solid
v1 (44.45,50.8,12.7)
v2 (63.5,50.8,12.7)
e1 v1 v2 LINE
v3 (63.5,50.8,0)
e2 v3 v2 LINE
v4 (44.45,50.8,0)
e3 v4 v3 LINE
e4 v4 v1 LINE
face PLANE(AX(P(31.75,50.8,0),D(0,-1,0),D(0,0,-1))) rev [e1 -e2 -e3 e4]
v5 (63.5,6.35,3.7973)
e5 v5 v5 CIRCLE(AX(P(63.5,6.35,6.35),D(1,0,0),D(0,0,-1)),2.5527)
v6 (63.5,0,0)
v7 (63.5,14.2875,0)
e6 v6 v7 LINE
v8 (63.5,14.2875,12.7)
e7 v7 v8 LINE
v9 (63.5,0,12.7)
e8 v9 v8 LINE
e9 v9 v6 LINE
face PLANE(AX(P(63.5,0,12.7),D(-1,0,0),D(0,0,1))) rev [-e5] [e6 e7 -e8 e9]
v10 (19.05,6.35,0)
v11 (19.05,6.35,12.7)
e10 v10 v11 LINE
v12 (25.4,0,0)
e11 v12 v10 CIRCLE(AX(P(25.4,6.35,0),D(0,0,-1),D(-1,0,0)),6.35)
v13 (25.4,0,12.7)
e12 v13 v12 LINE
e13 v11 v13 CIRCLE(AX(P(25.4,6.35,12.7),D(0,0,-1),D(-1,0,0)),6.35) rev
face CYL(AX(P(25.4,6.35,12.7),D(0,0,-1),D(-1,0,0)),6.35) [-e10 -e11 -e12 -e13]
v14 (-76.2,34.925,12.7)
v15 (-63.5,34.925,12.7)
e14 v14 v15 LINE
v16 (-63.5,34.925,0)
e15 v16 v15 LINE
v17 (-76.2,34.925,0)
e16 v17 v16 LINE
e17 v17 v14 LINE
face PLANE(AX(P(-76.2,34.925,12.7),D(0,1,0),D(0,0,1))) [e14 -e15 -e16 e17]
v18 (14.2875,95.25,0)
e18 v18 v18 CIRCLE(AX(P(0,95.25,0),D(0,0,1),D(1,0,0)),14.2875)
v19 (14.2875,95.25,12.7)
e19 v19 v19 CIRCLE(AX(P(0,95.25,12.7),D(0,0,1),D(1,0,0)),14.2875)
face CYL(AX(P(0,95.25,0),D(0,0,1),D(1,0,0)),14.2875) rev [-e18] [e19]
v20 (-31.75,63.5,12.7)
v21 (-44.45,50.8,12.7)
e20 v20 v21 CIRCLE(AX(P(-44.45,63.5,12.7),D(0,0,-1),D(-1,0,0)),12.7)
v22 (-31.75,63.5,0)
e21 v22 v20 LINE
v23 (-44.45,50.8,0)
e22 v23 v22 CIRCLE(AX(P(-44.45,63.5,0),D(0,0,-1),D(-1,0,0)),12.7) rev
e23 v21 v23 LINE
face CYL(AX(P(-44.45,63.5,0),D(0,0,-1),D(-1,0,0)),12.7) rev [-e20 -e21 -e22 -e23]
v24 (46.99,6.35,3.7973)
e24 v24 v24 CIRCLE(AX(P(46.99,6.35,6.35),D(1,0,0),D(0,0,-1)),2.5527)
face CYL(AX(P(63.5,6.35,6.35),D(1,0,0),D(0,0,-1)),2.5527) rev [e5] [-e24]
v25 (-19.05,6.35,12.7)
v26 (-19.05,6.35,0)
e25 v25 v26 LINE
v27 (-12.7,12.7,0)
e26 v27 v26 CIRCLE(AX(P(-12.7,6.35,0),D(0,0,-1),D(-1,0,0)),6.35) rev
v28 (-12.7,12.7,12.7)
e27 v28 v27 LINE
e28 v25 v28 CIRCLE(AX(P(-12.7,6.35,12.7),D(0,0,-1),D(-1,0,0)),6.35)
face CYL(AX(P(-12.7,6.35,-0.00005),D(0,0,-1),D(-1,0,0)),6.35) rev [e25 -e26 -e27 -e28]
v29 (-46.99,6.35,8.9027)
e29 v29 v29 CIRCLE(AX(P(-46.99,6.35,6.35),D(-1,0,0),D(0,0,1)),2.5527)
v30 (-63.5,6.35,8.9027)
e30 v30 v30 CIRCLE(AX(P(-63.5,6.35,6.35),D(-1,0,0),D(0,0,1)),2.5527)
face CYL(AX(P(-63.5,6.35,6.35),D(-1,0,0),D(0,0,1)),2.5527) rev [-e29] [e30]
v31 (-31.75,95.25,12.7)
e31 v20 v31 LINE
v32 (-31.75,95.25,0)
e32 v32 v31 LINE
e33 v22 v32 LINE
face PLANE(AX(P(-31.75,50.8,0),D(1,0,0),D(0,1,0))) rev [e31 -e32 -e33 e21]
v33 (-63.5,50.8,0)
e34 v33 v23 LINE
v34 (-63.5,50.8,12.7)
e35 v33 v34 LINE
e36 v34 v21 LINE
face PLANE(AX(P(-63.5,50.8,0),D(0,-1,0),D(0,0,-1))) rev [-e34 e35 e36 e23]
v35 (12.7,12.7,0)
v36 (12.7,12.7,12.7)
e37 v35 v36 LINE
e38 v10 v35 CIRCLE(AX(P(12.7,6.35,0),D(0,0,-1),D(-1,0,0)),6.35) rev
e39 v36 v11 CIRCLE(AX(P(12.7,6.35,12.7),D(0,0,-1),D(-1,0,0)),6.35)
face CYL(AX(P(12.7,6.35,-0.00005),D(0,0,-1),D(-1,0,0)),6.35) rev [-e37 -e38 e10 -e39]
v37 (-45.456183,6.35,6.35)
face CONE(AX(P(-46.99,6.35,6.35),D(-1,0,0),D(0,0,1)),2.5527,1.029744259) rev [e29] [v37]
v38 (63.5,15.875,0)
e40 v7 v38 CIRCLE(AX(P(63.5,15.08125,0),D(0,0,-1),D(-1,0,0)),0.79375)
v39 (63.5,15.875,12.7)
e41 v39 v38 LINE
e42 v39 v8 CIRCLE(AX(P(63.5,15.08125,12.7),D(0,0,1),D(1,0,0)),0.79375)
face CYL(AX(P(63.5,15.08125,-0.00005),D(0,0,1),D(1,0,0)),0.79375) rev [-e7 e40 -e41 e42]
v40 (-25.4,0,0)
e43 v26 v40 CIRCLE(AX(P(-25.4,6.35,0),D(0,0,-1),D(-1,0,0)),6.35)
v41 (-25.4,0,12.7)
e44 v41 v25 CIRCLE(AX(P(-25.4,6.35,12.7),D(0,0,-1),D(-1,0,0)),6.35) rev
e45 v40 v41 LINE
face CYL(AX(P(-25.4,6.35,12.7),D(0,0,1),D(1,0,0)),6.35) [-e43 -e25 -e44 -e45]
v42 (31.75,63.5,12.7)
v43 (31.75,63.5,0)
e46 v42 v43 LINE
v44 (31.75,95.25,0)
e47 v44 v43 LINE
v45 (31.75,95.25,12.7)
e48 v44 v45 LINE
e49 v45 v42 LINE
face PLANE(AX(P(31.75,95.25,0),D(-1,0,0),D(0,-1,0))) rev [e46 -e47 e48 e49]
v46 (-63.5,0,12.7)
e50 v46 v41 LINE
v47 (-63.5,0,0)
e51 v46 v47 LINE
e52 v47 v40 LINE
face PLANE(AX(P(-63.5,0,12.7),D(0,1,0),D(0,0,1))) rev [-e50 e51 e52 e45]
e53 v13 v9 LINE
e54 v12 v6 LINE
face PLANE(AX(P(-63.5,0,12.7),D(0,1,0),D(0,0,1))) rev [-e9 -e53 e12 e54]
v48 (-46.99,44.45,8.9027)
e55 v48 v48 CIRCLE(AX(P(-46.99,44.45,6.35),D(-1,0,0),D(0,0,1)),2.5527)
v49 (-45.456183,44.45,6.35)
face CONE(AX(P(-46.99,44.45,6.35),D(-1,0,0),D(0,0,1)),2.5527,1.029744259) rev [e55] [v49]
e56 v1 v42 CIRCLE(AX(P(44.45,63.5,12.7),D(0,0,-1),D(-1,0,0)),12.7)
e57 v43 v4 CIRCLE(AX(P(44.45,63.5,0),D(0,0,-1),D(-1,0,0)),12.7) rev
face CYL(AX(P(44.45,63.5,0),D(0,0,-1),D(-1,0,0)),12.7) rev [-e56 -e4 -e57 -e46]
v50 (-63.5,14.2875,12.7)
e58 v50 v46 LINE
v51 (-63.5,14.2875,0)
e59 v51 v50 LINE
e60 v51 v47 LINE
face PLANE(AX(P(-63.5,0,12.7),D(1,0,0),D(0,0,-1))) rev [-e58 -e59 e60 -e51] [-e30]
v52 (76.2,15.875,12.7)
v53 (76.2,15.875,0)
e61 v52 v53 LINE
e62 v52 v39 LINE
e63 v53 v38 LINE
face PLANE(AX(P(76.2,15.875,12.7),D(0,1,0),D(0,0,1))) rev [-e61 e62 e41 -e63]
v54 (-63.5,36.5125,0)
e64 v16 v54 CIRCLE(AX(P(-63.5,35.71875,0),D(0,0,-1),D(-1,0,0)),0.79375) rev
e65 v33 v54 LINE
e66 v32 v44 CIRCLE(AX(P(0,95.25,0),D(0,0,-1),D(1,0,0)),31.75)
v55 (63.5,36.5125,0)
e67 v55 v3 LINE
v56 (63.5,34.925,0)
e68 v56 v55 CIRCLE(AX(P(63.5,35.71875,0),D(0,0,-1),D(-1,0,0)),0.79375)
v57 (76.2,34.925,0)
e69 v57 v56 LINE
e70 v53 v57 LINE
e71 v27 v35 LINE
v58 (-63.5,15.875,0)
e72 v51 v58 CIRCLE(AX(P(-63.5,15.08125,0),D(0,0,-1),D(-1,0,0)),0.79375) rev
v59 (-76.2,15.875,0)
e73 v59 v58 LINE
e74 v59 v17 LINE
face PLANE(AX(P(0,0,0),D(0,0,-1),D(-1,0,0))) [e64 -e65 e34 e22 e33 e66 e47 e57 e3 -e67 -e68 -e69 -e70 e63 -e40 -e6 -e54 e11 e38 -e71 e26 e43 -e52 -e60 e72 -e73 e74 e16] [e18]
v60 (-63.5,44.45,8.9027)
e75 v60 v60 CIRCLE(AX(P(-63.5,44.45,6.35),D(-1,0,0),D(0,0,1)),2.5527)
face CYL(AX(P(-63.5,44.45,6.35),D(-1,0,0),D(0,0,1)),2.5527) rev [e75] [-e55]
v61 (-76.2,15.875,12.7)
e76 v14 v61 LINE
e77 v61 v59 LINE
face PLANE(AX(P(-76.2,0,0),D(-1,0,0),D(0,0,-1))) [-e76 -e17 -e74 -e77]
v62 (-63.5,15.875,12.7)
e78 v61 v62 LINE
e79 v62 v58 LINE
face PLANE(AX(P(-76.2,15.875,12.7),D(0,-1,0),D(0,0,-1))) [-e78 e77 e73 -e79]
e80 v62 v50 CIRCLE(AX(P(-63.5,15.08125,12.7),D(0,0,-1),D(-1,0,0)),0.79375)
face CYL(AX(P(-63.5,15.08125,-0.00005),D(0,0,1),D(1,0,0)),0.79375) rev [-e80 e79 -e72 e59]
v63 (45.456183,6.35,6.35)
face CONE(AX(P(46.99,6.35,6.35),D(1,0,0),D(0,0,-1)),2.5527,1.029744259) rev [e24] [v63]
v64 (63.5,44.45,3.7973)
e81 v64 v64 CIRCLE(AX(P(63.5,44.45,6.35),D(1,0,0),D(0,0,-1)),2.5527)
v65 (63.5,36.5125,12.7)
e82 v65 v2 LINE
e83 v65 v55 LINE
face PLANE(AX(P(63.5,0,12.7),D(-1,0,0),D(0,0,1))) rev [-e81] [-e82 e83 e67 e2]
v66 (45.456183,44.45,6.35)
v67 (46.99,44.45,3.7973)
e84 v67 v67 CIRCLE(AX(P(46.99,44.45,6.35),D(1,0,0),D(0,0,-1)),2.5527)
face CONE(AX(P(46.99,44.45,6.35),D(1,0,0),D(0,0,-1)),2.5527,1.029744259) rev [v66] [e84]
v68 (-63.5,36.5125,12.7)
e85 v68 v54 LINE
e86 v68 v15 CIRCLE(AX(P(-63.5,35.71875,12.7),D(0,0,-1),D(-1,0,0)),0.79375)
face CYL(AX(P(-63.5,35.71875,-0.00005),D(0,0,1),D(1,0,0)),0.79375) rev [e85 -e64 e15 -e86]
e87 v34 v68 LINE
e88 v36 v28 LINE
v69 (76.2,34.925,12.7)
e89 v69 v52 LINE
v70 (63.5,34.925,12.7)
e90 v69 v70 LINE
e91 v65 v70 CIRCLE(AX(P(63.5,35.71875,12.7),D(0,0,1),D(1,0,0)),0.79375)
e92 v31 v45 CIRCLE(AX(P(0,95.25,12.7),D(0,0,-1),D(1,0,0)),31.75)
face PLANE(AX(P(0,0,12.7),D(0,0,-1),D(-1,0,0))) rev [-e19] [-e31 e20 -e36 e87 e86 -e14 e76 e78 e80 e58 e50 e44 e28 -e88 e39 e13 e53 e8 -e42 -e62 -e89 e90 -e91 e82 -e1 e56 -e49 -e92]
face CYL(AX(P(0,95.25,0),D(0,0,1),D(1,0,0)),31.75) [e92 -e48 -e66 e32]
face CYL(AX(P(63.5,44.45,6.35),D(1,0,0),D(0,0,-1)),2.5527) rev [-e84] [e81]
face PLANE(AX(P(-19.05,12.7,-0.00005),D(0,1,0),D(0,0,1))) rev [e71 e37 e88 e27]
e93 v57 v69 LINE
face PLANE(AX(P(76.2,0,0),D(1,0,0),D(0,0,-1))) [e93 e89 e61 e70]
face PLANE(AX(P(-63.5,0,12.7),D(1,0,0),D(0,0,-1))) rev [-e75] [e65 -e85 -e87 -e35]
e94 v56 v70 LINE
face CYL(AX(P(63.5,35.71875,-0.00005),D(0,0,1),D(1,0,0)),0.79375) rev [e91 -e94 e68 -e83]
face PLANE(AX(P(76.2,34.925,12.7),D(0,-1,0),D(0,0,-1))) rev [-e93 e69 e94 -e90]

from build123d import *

# Parameters (mm, degrees)
SKETCH1_W                        = 127
SKETCH1_H                        = 152.4
BOSS_EXTRUDE1_DEPTH              = 12.7
SKETCH2_R                        = 14.2875
CUT_EXTRUDE1_DEPTH               = 166.587741092
FILLET1_R                        = 12.7
F_1_4_20_TAPPED_HOLE1_AT_2_COUNT = 2
F_1_4_20_TAPPED_HOLE1_AT_2_PITCH = 38.1
SKETCH5_W                        = 12.7
SKETCH5_H                        = 19.05
BOSS_EXTRUDE2_DEPTH              = 12.7
SKETCH6_R                        = 0.79375
CUT_EXTRUDE2_DEPTH               = 149.649688866
SKETCH7_W                        = 38.1
SKETCH7_H                        = 12.7
CUT_EXTRUDE3_DEPTH               = 149.649688866
FILLET2_START                    = -1
FILLET2_DEPTH                    = 15
FILLET2_2_DEPTH                  = 12.7


with BuildPart() as part:
    # Sketch1 → Boss-Extrude1 (new body)
    with BuildSketch(Plane.XY):
        with Locations((0, 76.2)):
            Rectangle(SKETCH1_W, SKETCH1_H)
    extrude(amount=BOSS_EXTRUDE1_DEPTH)

    # Sketch2 → Cut-Extrude1 (cut, through all)
    with BuildSketch(Plane.XY.offset(12.7)):
        with Locations((0, 95.25)):
            Circle(SKETCH2_R)
        with BuildLine():
            Line((31.75, 95.25), (31.75, 50.8))
            Line((31.75, 50.8), (63.5, 50.8))
            Line((63.5, 50.8), (63.5, 152.4))
            Line((63.5, 152.4), (-63.5, 152.4))
            Line((-63.5, 152.4), (-63.5, 50.8))
            Line((-63.5, 50.8), (-31.75, 50.8))
            Line((-31.75, 50.8), (-31.75, 95.25))
            ThreePointArc((-31.75, 95.25), (0, 127), (31.75, 95.25))
        make_face()
    extrude(amount=-CUT_EXTRUDE1_DEPTH, mode=Mode.SUBTRACT)

    # Fillet1
    fillet1_edges = [part.edges().sort_by_distance(p)[0] for p in [
        (-31.75, 50.8, 6.35),
        (31.75, 50.8, 6.35),
    ]]
    fillet(fillet1_edges, radius=FILLET1_R)

    # Sketch3 → 1/4-20 Tapped Hole1 (revolve, cut)
    with BuildSketch(Plane(origin=(63.5, 44.45, 6.35), x_dir=(0, 0, -1), z_dir=(0, 1, 0))):
        Polygon((0, 0), (0, 18.043816902), (2.5527, 16.51), (2.5527, 0), align=None)
    f_1_4_20_tapped_hole1 = revolve(axis=Axis((69.85, 44.45, 6.35), (-1, 0, 0)), mode=Mode.SUBTRACT)

    # 1/4-20 Tapped Hole1 at 2: 1/4-20 Tapped Hole1 ×2
    with Locations(*[(0, -i * F_1_4_20_TAPPED_HOLE1_AT_2_PITCH, 0) for i in range(1, F_1_4_20_TAPPED_HOLE1_AT_2_COUNT)]):
        add(f_1_4_20_tapped_hole1, mode=Mode.SUBTRACT)

    # Sketch5 → Boss-Extrude2 (add)
    with BuildSketch(Plane(origin=(63.5, 0, 0), x_dir=(0, 0, -1), z_dir=(1, 0, 0))):
        with Locations((-6.35, 25.4)):
            Rectangle(SKETCH5_W, SKETCH5_H)
    boss_extrude2 = extrude(amount=BOSS_EXTRUDE2_DEPTH)

    # Sketch6 → Cut-Extrude2 (cut, through all)
    with BuildSketch(Plane.XY.offset(12.7)):
        with Locations((63.5, 35.71875)):
            Circle(SKETCH6_R)
        with Locations((63.5, 15.08125)):
            Circle(SKETCH6_R)
    cut_extrude2 = extrude(amount=-CUT_EXTRUDE2_DEPTH, mode=Mode.SUBTRACT)

    # Mirror1: 1/4-20 Tapped Hole1, Boss-Extrude2, Cut-Extrude2 across plane
    add(f_1_4_20_tapped_hole1.mirror(Plane(origin=(0, 0, 0), x_dir=(0, 0, 1), z_dir=(1, 0, 0))), mode=Mode.SUBTRACT)
    add(boss_extrude2.mirror(Plane(origin=(0, 0, 0), x_dir=(0, 0, 1), z_dir=(1, 0, 0))))
    add(cut_extrude2.mirror(Plane(origin=(0, 0, 0), x_dir=(0, 0, 1), z_dir=(1, 0, 0))), mode=Mode.SUBTRACT)

    # Mirror1 copy 1 sketch → Mirror1 copy 1 (revolve, cut)
    with BuildSketch(Plane(origin=(-63.5, 6.35, 6.35), x_dir=(0, 0, -1), z_dir=(0, 1, 0))):
        Polygon((0, 0), (0, -18.043816902), (2.5527, -16.51), (2.5527, 0), align=None)
    revolve(axis=Axis((-69.85, 6.35, 6.35), (-1, 0, 0)), mode=Mode.SUBTRACT)

    # Sketch7 → Cut-Extrude3 (cut, through all)
    with BuildSketch(Plane.XY.offset(12.7)):
        with Locations((0, 6.35)):
            Rectangle(SKETCH7_W, SKETCH7_H)
    extrude(amount=-CUT_EXTRUDE3_DEPTH, mode=Mode.SUBTRACT)

    # Fillet2: read off the stored shape, not the designer's step
    # Fillet2 outline → Fillet2 (cut)
    with BuildSketch(Plane.XY.offset(FILLET2_START)):
        with BuildLine():
            Line((19.05, 0), (25.4, 0))
            ThreePointArc((25.4, 0), (20.909871939, 1.859871939), (19.05, 6.35))
            Line((19.05, 6.35), (19.05, 0))
        make_face()
        with BuildLine():
            Line((-19.05, 0), (-19.05, 6.35))
            ThreePointArc((-19.05, 6.35), (-20.909871939, 1.859871939), (-25.4, 0))
            Line((-25.4, 0), (-19.05, 0))
        make_face()
    extrude(amount=FILLET2_DEPTH, mode=Mode.SUBTRACT)

    # Fillet2 2 outline → Fillet2 2 (add)
    with BuildSketch(Plane.XY):
        with BuildLine():
            ThreePointArc((-19.05, 6.35), (-17.190128061, 10.840128061), (-12.7, 12.7))
            Line((-12.7, 12.7), (-19.05, 12.7))
            Line((-19.05, 12.7), (-19.05, 6.35))
        make_face()
        with BuildLine():
            ThreePointArc((12.7, 12.7), (17.190128061, 10.840128061), (19.05, 6.35))
            Line((19.05, 6.35), (19.05, 12.7))
            Line((19.05, 12.7), (12.7, 12.7))
        make_face()
    extrude(amount=FILLET2_2_DEPTH)


solid = part.part
